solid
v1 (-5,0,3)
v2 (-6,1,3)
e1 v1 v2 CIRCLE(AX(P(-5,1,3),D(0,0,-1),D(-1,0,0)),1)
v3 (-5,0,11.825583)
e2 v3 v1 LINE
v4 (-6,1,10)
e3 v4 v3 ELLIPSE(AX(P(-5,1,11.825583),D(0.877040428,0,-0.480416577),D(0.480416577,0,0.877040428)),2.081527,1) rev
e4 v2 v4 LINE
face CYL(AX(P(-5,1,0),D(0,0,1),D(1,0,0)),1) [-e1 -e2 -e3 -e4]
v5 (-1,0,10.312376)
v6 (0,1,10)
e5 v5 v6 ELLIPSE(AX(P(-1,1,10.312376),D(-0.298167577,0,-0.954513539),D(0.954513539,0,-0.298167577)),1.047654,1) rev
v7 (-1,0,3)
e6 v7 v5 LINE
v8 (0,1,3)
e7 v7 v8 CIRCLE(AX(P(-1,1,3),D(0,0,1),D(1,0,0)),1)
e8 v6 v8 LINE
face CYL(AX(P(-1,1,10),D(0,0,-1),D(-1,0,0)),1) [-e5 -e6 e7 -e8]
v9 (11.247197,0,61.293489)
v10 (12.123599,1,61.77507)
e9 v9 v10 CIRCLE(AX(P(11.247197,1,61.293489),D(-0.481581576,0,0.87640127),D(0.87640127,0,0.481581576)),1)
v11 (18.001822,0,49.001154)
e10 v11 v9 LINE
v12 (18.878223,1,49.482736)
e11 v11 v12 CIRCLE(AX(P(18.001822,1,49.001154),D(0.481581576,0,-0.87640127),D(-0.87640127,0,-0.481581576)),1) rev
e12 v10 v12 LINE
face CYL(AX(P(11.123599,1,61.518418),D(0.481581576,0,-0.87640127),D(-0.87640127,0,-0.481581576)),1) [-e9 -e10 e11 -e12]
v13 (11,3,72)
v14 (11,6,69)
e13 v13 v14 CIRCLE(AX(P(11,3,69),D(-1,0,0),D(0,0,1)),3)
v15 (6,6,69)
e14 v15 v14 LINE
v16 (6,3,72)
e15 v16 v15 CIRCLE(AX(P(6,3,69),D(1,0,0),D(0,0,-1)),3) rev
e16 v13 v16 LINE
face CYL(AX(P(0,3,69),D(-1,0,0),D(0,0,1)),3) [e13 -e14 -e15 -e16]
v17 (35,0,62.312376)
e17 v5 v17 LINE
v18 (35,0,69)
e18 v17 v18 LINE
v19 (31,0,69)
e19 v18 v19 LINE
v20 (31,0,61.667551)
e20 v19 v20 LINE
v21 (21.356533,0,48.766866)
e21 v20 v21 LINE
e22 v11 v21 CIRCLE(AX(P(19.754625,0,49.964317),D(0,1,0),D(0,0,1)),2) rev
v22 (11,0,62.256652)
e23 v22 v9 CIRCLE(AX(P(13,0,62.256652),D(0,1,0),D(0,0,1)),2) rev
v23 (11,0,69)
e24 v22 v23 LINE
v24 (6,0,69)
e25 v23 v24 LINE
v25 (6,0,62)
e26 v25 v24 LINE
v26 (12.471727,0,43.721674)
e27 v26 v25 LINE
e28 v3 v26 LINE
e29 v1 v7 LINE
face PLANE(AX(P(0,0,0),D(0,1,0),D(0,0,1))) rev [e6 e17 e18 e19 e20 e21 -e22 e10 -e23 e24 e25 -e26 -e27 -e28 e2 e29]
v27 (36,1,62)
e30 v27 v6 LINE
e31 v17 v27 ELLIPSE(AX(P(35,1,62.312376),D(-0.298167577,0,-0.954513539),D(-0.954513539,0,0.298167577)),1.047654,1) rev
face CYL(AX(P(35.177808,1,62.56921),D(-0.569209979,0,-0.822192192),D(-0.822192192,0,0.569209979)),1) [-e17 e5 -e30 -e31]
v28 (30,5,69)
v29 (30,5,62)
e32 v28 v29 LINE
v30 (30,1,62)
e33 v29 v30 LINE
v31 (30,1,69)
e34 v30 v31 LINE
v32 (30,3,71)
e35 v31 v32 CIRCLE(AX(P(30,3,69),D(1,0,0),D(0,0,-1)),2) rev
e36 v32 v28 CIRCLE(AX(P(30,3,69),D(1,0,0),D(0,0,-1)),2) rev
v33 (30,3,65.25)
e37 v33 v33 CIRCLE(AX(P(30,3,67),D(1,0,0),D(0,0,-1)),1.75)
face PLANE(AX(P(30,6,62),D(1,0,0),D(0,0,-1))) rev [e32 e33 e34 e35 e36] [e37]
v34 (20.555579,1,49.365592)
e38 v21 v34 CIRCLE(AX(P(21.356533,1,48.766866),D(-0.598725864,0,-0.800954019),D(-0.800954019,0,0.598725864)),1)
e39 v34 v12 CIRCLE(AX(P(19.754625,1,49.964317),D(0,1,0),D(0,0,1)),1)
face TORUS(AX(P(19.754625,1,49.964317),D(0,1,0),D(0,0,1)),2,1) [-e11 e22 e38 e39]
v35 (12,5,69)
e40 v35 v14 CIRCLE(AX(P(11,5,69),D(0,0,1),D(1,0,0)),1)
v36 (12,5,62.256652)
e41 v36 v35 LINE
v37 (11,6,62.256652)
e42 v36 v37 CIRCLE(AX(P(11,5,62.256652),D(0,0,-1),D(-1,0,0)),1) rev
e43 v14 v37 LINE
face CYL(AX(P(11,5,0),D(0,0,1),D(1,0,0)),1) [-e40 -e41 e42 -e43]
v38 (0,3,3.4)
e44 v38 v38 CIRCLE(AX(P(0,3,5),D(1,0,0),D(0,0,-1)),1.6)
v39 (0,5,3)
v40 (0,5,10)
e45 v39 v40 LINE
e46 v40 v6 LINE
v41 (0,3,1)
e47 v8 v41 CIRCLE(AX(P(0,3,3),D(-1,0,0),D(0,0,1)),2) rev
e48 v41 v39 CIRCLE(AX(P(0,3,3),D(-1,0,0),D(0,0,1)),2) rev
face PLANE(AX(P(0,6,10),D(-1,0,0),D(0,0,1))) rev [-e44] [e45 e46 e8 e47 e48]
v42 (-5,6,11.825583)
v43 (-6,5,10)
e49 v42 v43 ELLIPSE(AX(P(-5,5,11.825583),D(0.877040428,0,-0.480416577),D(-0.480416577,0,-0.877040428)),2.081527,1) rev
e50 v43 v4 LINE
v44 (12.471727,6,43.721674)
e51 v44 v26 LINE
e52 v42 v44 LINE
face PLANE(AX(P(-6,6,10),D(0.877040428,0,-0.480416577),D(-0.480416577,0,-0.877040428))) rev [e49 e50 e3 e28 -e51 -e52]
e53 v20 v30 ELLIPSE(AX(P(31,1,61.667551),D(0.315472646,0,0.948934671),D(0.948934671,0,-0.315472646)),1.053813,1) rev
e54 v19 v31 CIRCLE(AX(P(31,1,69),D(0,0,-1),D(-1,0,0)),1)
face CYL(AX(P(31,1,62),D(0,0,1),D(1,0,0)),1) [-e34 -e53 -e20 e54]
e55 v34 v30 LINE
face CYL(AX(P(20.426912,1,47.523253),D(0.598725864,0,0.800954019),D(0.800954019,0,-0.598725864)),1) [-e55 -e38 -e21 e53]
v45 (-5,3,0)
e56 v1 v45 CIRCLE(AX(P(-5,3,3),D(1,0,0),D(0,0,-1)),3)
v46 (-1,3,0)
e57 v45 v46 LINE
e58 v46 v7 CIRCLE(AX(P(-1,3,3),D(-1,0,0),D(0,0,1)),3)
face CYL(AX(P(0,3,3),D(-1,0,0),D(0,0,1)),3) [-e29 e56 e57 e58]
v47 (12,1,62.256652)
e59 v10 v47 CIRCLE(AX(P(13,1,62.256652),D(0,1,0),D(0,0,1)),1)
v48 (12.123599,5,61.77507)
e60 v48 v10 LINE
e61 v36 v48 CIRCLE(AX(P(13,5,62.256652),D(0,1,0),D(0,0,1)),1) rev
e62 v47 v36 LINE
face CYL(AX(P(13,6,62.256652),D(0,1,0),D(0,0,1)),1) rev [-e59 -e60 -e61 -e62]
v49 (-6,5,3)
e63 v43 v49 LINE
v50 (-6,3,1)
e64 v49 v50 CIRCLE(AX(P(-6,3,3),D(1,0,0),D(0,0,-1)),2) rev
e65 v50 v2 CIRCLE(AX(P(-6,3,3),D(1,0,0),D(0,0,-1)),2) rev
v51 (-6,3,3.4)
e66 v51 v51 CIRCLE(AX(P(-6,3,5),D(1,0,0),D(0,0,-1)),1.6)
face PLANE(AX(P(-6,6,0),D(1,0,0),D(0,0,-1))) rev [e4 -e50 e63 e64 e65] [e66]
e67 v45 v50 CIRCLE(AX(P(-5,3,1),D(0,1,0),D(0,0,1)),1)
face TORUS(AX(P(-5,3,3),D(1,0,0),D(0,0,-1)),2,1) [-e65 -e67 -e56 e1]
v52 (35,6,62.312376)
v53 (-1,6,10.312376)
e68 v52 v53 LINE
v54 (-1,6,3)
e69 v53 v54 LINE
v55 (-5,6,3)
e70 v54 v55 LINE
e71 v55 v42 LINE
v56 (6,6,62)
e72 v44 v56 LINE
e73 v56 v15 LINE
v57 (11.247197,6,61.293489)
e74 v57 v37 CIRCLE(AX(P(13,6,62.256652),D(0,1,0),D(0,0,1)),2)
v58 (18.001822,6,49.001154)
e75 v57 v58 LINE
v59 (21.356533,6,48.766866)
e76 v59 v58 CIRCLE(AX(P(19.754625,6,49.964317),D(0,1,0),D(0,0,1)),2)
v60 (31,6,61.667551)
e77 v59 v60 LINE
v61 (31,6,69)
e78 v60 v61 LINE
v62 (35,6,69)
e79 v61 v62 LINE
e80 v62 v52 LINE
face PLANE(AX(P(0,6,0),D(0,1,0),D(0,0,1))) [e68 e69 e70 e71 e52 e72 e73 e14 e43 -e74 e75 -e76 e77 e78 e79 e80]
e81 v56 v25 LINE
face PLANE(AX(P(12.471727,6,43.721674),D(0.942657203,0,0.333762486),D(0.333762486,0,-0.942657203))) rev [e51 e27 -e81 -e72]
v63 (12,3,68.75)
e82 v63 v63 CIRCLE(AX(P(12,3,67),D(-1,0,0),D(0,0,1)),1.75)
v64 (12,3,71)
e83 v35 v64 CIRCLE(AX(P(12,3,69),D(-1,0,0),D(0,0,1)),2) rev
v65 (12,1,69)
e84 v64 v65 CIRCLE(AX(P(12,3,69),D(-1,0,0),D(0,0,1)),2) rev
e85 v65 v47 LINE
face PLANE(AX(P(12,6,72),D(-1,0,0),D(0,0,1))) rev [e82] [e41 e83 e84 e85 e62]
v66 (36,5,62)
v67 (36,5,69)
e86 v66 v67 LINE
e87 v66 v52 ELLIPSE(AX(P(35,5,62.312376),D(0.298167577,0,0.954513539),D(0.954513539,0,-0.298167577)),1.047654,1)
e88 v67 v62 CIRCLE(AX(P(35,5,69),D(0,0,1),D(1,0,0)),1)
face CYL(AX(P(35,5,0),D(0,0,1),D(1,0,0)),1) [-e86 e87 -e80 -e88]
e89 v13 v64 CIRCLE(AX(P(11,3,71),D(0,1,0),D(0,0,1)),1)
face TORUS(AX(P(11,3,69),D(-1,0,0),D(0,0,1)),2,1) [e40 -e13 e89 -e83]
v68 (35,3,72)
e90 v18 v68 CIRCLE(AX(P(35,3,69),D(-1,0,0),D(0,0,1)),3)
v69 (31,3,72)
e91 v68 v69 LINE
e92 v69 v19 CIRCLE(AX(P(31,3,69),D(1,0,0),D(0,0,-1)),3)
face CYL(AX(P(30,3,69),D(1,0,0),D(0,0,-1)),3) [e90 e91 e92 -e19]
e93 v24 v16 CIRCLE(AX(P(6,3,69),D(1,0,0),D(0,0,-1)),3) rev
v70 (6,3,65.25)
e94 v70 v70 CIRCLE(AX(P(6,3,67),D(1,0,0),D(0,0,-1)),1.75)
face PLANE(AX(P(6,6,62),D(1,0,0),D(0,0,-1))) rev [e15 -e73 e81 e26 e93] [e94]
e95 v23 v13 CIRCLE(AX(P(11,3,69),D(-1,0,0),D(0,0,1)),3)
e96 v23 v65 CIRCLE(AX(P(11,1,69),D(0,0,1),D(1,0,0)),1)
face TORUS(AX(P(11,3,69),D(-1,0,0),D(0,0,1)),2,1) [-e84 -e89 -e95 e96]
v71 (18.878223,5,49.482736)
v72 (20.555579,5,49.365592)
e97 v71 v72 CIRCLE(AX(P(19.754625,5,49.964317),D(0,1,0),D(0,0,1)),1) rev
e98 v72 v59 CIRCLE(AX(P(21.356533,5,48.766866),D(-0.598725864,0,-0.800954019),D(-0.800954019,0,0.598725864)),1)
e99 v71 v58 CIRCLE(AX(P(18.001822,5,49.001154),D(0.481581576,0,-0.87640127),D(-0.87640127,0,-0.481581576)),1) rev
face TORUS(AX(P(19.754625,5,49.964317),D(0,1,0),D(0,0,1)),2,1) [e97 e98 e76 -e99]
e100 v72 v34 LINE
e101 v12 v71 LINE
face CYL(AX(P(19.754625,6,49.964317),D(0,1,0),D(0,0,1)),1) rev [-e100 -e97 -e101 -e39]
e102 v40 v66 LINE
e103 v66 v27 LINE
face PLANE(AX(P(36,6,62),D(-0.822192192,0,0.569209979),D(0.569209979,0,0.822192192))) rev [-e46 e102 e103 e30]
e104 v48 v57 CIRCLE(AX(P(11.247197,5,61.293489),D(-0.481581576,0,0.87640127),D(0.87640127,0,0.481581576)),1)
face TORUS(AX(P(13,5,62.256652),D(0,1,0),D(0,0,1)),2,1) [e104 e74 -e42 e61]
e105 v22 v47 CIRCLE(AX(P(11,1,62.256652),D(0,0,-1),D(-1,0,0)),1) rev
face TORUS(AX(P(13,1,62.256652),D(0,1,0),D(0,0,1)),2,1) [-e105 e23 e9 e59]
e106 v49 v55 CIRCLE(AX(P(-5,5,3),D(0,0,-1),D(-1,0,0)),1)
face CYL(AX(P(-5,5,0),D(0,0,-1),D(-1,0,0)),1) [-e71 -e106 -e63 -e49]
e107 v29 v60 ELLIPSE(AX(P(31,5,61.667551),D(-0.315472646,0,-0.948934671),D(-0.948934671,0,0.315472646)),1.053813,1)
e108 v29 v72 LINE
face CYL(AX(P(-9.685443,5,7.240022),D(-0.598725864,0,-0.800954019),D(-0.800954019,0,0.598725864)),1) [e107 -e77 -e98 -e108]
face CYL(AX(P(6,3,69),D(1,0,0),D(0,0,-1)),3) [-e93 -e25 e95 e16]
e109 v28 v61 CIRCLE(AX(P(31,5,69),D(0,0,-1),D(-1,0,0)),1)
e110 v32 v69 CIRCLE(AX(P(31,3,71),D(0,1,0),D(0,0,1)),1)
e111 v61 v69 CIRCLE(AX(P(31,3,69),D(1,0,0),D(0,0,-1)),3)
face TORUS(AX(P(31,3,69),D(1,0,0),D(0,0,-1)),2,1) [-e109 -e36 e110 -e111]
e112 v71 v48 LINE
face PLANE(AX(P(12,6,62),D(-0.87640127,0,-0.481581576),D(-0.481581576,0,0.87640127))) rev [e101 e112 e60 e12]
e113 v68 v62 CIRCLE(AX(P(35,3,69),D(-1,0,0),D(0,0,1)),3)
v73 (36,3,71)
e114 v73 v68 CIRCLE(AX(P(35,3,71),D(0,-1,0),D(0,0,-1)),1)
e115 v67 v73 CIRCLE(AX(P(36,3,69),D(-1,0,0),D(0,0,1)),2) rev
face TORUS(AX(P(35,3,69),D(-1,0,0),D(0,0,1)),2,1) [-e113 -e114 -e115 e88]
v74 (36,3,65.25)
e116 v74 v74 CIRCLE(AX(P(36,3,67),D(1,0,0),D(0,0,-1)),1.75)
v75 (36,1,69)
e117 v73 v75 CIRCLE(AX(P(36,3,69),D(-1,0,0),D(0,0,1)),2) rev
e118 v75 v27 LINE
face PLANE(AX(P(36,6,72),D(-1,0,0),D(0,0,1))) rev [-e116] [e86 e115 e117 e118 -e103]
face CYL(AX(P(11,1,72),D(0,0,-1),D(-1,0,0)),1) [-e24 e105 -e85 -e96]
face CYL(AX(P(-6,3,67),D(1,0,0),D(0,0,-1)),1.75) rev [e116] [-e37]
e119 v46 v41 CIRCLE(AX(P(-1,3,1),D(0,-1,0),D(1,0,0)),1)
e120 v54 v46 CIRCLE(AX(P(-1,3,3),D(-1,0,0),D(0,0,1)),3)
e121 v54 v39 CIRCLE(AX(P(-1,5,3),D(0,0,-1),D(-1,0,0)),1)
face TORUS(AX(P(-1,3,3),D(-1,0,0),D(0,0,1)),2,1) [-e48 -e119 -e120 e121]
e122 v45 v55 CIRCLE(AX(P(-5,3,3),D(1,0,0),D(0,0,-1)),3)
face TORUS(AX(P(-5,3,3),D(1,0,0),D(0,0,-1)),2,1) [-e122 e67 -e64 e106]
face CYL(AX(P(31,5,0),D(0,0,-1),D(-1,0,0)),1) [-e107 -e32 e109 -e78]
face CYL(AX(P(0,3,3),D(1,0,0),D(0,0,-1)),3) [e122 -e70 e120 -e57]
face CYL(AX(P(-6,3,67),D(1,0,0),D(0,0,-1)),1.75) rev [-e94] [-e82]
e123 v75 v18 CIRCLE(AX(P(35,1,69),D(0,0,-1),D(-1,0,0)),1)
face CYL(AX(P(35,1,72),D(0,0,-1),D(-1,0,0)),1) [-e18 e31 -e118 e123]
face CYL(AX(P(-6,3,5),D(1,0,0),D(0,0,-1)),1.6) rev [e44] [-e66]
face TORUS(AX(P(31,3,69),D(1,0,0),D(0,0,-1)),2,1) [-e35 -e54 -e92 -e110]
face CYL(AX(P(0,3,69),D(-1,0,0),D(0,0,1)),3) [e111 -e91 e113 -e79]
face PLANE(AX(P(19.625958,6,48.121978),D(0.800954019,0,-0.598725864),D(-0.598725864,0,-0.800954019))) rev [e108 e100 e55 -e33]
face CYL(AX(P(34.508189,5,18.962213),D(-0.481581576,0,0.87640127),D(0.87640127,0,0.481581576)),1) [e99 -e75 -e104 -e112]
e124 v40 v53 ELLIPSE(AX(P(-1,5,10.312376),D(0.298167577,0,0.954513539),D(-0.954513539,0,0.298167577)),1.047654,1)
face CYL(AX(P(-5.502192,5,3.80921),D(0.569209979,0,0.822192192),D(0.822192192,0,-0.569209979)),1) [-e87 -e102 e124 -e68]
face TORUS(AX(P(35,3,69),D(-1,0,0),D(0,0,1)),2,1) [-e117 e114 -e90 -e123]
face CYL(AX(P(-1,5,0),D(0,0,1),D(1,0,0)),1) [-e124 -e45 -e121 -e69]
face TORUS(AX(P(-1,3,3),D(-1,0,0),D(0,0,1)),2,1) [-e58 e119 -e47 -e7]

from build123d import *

# Parameters (mm, degrees)
BOSS_EXTRUDE1_DEPTH = 6
SKETCH3_R           = 1.75
CUT_EXTRUDE1_DEPTH  = 84.570329663
SKETCH4_R           = 1.6
CUT_EXTRUDE2_DEPTH  = 81.721744282
FILLET1_R           = 3
FILLET2_R           = 1


with BuildPart() as part:
    # Sketch2 → Boss-Extrude1 (new body)
    with BuildSketch(Plane(origin=(0, 0, 0), x_dir=(1, 0, 0), z_dir=(0, 1, 0))):
        Polygon((6, -72), (12, -72), (12, -62), (19.625958238, -48.121978446), (30, -62), (30, -72), (36, -72), (36, -62), (0, -10), (0, 0), (-6, 0), (-6, -10), (12.471726571, -43.721673541), (6, -62), align=None)
    extrude(amount=BOSS_EXTRUDE1_DEPTH)

    # Sketch3 → Cut-Extrude1 (cut, through all)
    with BuildSketch(Plane(origin=(36, 0, 0), x_dir=(0, 0, -1), z_dir=(1, 0, 0))):
        with Locations((-67, 3)):
            Circle(SKETCH3_R)
    extrude(amount=-CUT_EXTRUDE1_DEPTH, mode=Mode.SUBTRACT)

    # Sketch4 → Cut-Extrude2 (cut, through all)
    with BuildSketch(Plane(origin=(0, 0, 0), x_dir=(0, 0, -1), z_dir=(1, 0, 0))):
        with Locations((-5, 3)):
            Circle(SKETCH4_R)
    extrude(amount=-CUT_EXTRUDE2_DEPTH, mode=Mode.SUBTRACT)

    # Fillet1
    fillet1_edges = [part.edges().sort_by_distance(p)[0] for p in [
        (-3, 0, 0),
        (-3, 6, 0),
        (33, 0, 72),
        (33, 6, 72),
        (9, 0, 72),
        (9, 6, 72),
    ]]
    fillet(fillet1_edges, radius=FILLET1_R - 0.0001)  # a hair under: the kernel refuses the full size

    # Fillet2
    fillet2_edges = [part.edges().sort_by_distance(p)[0] for p in [
        (0, 0, 6.49995),
        (18, 0, 36),
        (30, 0, 65.50005),
        (24.812979119, 0, 55.060989223),
        (15.812979119, 0, 55.060989223),
        (19.625958238, 3, 48.121978446),
        (12, 3, 62),
        (15.812979119, 6, 55.060989223),
        (24.812979119, 6, 55.060989223),
        (30, 6, 65.50005),
        (18, 6, 36),
        (0, 6, 6.49995),
        (-6, 0, 6.49995),
        (-6, 6, 6.49995),
        (-6, 5.121349633, 0.878650367),
        (-6, 0.878650367, 0.878650367),
        (36, 0, 65.50005),
        (12, 0, 65.50005),
        (0, 5.121349633, 0.878650367),
        (0, 0.878650367, 0.878650367),
        (12, 6, 65.50005),
        (36, 6, 65.50005),
        (36, 5.121349633, 71.121349633),
        (36, 0.878650367, 71.121349633),
        (30, 5.121349633, 71.121349633),
        (30, 0.878650367, 71.121349633),
        (12, 5.121349633, 71.121349633),
        (12, 0.878650367, 71.121349633),
    ]]
    fillet(fillet2_edges, radius=FILLET2_R)


solid = part.part
